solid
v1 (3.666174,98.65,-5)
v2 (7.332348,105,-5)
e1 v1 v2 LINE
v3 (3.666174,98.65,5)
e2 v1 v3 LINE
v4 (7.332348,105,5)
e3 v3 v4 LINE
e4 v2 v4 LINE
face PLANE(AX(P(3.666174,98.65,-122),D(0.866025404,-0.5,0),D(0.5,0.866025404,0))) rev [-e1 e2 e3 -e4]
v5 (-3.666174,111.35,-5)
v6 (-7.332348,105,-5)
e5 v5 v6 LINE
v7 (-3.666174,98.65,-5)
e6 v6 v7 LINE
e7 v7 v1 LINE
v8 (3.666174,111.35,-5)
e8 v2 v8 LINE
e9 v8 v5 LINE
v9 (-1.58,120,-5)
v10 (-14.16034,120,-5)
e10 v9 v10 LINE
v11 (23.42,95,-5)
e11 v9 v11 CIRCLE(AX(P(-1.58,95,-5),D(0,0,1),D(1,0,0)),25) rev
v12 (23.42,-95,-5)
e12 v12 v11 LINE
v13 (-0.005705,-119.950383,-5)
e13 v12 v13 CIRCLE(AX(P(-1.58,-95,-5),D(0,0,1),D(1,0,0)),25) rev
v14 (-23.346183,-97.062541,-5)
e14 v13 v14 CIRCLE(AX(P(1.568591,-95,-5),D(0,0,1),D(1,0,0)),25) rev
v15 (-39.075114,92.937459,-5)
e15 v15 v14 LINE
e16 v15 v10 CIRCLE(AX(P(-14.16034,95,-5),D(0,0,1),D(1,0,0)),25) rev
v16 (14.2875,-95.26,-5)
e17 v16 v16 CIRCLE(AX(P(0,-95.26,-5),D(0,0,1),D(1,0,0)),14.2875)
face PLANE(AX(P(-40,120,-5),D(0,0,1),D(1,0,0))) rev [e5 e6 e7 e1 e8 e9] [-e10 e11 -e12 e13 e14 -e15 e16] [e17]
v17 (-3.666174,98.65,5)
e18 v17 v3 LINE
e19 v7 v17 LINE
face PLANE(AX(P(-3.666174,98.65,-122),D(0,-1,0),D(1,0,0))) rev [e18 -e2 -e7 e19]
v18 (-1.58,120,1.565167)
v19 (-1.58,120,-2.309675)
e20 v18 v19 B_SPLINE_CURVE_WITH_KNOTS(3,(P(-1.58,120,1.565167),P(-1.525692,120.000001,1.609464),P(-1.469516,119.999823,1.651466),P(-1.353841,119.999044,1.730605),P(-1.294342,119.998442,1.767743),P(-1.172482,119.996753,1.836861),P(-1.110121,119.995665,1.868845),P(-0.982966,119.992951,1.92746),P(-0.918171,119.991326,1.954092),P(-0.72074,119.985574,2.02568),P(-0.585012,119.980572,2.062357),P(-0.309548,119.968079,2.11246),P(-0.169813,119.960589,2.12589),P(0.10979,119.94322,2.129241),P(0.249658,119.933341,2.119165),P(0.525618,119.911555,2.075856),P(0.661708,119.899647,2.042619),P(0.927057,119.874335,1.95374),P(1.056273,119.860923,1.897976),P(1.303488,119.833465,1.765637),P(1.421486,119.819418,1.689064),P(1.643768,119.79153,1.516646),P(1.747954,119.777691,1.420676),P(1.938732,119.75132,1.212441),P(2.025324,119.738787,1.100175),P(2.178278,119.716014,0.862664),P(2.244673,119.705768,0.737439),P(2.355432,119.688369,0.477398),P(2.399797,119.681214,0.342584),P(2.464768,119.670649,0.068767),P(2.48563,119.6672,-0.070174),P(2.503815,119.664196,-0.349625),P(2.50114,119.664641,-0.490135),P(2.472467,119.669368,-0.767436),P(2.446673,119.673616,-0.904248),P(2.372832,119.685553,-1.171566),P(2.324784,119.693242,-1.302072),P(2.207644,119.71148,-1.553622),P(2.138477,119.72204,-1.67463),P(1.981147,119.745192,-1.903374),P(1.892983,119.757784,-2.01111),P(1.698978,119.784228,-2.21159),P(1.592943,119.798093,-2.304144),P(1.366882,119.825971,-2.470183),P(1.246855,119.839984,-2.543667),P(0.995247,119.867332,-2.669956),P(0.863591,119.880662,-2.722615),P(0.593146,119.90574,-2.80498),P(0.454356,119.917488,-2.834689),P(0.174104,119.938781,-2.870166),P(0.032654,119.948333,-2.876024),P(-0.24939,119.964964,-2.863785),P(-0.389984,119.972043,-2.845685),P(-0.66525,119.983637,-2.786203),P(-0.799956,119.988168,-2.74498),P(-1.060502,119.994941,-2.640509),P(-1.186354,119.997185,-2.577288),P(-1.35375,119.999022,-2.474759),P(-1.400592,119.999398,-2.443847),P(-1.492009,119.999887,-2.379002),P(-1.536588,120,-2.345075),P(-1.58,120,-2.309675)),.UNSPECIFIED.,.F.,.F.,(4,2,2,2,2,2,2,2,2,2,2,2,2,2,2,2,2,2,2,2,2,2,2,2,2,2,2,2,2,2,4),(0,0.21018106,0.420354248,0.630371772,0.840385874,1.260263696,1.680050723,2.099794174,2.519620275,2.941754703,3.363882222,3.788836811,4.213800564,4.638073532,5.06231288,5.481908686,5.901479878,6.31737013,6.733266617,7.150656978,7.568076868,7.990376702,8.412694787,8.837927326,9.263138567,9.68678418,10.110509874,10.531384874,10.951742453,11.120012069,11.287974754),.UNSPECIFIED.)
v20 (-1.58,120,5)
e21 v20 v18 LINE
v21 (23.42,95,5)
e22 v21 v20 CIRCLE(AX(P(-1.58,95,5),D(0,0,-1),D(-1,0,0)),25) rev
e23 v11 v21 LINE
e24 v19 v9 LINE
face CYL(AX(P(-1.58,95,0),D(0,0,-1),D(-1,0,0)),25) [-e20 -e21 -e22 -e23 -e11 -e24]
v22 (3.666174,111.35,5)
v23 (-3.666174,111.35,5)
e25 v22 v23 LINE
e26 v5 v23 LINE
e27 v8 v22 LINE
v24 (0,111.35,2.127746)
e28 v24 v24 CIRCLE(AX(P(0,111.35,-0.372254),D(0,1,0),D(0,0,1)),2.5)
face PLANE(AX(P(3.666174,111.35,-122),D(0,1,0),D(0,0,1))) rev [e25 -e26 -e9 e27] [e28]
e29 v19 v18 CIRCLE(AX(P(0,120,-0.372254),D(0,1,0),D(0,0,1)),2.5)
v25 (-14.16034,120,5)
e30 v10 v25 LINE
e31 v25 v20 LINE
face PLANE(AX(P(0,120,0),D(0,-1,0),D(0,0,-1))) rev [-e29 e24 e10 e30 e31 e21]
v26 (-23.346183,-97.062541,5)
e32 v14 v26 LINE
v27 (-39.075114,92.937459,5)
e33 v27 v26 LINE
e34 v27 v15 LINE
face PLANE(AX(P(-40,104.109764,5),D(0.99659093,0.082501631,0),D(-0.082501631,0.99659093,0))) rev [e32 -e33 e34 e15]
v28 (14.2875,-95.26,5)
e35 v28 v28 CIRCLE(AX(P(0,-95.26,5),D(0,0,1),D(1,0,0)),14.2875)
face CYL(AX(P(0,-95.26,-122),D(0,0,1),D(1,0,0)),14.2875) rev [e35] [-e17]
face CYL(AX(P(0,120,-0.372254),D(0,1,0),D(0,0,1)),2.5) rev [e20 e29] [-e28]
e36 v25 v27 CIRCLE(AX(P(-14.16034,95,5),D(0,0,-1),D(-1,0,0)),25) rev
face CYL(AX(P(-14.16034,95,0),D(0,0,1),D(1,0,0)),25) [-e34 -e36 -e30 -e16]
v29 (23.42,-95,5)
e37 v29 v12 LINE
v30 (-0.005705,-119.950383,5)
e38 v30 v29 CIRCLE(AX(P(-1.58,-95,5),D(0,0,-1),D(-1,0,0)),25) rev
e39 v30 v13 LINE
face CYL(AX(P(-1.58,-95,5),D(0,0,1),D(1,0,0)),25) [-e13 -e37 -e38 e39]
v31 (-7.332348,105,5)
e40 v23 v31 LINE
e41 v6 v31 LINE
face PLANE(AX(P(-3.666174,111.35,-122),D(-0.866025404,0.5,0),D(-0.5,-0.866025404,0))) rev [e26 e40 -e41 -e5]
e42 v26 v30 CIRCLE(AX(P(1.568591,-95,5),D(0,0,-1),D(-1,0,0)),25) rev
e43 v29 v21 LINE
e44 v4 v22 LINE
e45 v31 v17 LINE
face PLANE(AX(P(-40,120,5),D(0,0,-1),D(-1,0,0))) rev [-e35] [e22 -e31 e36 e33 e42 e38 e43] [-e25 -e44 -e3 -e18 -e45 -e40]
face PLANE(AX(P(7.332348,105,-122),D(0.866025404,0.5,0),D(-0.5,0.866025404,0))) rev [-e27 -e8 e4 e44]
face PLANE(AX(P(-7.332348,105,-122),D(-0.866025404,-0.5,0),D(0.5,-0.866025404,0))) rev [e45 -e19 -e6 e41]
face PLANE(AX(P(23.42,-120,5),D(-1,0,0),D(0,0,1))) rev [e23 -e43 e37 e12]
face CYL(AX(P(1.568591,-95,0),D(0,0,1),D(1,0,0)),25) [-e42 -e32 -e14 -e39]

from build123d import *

# Parameters (mm, degrees)
SKETCH1_W                       = 80
SKETCH1_H                       = 10
BOSS_EXTRUDE1_DEPTH             = 120
SKETCH2_R                       = 14.2875
HOLES_DEPTH                     = 127
SKETCH5_W                       = 16.58
SKETCH5_H                       = 240
WEDGE_SHAPE_DEPTH               = 127.885775404
FILLET6_START                   = -6
FILLET6_DEPTH                   = 12
TAP_DRILL_FOR_M6X1_0_TAP1_D     = 5
TAP_DRILL_FOR_M6X1_0_TAP1_DEPTH = 8.651


with BuildPart() as part:
    # Sketch1 → Boss-Extrude1 (new, symmetric)
    with BuildSketch(Plane(origin=(0, 0, 0), x_dir=(1, 0, 0), z_dir=(0, 1, 0))):
        Rectangle(SKETCH1_W, SKETCH1_H)
    extrude(amount=BOSS_EXTRUDE1_DEPTH, both=True)

    # Sketch2 → Holes (cut)
    with BuildSketch(Plane.XY.offset(5)):
        with Locations((0, -95.26)):
            Circle(SKETCH2_R)
        Polygon((3.666174209, 98.65), (7.332348419, 105), (3.666174209, 111.35), (-3.666174209, 111.35), (-7.332348419, 105), (-3.666174209, 98.65), align=None)
    extrude(amount=-HOLES_DEPTH, mode=Mode.SUBTRACT)

    # Sketch5 → Wedge shape (cut, through all)
    with BuildSketch(Plane(origin=(0, 0, -5), x_dir=(-1, 0, 0), z_dir=(0, 0, -1))):
        with BuildLine():
            Line((40, 104.109763944), (21.447331521, -120))
            ThreePointArc((21.447331521, -120), (30.723665761, -120.383309719), (40, -120))
            Line((40, -120), (40, 104.109763944))
        make_face()
        with Locations((-31.71, 0)):
            Rectangle(SKETCH5_W, SKETCH5_H)
    extrude(amount=-WEDGE_SHAPE_DEPTH, mode=Mode.SUBTRACT)

    # Fillet6: read off the stored shape, not the designer's step
    # Fillet6 outline → Fillet6 (cut)
    with BuildSketch(Plane.XY.offset(FILLET6_START)):
        with BuildLine():
            ThreePointArc((-0.005704702, -119.950382649), (-15.93515227, -112.84990156), (-23.346182643, -97.062540783))
            Line((-23.346182643, -97.062540783), (-21.447331521, -120))
            Line((-21.447331521, -120), (23.42, -120))
            Line((23.42, -120), (23.42, -95))
            ThreePointArc((23.42, -95), (16.645769976, -112.112022346), (-0.005704702, -119.950382649))
        make_face()
        with BuildLine():
            Line((-40, 104.109763944), (-39.075113631, 92.937459217))
            ThreePointArc((-39.075113631, 92.937459217), (-32.552777964, 111.932756427), (-14.160340393, 120))
            Line((-14.160340393, 120), (-40, 120))
            Line((-40, 120), (-40, 104.109763944))
        make_face()
        with BuildLine():
            ThreePointArc((-1.58, 120), (16.09766953, 112.67766953), (23.42, 95))
            Line((23.42, 95), (23.42, 120))
            Line((23.42, 120), (-1.58, 120))
        make_face()
    extrude(amount=FILLET6_DEPTH, mode=Mode.SUBTRACT)

    # Tap Drill for M6x1.0 Tap1
    with Locations(Plane(origin=(0, 120, -0.37225415), x_dir=(0, 0, 1), z_dir=(0, 1, 0))):
        with Locations((0, 0)):
            Hole(TAP_DRILL_FOR_M6X1_0_TAP1_D / 2, depth=TAP_DRILL_FOR_M6X1_0_TAP1_DEPTH)


solid = part.part
